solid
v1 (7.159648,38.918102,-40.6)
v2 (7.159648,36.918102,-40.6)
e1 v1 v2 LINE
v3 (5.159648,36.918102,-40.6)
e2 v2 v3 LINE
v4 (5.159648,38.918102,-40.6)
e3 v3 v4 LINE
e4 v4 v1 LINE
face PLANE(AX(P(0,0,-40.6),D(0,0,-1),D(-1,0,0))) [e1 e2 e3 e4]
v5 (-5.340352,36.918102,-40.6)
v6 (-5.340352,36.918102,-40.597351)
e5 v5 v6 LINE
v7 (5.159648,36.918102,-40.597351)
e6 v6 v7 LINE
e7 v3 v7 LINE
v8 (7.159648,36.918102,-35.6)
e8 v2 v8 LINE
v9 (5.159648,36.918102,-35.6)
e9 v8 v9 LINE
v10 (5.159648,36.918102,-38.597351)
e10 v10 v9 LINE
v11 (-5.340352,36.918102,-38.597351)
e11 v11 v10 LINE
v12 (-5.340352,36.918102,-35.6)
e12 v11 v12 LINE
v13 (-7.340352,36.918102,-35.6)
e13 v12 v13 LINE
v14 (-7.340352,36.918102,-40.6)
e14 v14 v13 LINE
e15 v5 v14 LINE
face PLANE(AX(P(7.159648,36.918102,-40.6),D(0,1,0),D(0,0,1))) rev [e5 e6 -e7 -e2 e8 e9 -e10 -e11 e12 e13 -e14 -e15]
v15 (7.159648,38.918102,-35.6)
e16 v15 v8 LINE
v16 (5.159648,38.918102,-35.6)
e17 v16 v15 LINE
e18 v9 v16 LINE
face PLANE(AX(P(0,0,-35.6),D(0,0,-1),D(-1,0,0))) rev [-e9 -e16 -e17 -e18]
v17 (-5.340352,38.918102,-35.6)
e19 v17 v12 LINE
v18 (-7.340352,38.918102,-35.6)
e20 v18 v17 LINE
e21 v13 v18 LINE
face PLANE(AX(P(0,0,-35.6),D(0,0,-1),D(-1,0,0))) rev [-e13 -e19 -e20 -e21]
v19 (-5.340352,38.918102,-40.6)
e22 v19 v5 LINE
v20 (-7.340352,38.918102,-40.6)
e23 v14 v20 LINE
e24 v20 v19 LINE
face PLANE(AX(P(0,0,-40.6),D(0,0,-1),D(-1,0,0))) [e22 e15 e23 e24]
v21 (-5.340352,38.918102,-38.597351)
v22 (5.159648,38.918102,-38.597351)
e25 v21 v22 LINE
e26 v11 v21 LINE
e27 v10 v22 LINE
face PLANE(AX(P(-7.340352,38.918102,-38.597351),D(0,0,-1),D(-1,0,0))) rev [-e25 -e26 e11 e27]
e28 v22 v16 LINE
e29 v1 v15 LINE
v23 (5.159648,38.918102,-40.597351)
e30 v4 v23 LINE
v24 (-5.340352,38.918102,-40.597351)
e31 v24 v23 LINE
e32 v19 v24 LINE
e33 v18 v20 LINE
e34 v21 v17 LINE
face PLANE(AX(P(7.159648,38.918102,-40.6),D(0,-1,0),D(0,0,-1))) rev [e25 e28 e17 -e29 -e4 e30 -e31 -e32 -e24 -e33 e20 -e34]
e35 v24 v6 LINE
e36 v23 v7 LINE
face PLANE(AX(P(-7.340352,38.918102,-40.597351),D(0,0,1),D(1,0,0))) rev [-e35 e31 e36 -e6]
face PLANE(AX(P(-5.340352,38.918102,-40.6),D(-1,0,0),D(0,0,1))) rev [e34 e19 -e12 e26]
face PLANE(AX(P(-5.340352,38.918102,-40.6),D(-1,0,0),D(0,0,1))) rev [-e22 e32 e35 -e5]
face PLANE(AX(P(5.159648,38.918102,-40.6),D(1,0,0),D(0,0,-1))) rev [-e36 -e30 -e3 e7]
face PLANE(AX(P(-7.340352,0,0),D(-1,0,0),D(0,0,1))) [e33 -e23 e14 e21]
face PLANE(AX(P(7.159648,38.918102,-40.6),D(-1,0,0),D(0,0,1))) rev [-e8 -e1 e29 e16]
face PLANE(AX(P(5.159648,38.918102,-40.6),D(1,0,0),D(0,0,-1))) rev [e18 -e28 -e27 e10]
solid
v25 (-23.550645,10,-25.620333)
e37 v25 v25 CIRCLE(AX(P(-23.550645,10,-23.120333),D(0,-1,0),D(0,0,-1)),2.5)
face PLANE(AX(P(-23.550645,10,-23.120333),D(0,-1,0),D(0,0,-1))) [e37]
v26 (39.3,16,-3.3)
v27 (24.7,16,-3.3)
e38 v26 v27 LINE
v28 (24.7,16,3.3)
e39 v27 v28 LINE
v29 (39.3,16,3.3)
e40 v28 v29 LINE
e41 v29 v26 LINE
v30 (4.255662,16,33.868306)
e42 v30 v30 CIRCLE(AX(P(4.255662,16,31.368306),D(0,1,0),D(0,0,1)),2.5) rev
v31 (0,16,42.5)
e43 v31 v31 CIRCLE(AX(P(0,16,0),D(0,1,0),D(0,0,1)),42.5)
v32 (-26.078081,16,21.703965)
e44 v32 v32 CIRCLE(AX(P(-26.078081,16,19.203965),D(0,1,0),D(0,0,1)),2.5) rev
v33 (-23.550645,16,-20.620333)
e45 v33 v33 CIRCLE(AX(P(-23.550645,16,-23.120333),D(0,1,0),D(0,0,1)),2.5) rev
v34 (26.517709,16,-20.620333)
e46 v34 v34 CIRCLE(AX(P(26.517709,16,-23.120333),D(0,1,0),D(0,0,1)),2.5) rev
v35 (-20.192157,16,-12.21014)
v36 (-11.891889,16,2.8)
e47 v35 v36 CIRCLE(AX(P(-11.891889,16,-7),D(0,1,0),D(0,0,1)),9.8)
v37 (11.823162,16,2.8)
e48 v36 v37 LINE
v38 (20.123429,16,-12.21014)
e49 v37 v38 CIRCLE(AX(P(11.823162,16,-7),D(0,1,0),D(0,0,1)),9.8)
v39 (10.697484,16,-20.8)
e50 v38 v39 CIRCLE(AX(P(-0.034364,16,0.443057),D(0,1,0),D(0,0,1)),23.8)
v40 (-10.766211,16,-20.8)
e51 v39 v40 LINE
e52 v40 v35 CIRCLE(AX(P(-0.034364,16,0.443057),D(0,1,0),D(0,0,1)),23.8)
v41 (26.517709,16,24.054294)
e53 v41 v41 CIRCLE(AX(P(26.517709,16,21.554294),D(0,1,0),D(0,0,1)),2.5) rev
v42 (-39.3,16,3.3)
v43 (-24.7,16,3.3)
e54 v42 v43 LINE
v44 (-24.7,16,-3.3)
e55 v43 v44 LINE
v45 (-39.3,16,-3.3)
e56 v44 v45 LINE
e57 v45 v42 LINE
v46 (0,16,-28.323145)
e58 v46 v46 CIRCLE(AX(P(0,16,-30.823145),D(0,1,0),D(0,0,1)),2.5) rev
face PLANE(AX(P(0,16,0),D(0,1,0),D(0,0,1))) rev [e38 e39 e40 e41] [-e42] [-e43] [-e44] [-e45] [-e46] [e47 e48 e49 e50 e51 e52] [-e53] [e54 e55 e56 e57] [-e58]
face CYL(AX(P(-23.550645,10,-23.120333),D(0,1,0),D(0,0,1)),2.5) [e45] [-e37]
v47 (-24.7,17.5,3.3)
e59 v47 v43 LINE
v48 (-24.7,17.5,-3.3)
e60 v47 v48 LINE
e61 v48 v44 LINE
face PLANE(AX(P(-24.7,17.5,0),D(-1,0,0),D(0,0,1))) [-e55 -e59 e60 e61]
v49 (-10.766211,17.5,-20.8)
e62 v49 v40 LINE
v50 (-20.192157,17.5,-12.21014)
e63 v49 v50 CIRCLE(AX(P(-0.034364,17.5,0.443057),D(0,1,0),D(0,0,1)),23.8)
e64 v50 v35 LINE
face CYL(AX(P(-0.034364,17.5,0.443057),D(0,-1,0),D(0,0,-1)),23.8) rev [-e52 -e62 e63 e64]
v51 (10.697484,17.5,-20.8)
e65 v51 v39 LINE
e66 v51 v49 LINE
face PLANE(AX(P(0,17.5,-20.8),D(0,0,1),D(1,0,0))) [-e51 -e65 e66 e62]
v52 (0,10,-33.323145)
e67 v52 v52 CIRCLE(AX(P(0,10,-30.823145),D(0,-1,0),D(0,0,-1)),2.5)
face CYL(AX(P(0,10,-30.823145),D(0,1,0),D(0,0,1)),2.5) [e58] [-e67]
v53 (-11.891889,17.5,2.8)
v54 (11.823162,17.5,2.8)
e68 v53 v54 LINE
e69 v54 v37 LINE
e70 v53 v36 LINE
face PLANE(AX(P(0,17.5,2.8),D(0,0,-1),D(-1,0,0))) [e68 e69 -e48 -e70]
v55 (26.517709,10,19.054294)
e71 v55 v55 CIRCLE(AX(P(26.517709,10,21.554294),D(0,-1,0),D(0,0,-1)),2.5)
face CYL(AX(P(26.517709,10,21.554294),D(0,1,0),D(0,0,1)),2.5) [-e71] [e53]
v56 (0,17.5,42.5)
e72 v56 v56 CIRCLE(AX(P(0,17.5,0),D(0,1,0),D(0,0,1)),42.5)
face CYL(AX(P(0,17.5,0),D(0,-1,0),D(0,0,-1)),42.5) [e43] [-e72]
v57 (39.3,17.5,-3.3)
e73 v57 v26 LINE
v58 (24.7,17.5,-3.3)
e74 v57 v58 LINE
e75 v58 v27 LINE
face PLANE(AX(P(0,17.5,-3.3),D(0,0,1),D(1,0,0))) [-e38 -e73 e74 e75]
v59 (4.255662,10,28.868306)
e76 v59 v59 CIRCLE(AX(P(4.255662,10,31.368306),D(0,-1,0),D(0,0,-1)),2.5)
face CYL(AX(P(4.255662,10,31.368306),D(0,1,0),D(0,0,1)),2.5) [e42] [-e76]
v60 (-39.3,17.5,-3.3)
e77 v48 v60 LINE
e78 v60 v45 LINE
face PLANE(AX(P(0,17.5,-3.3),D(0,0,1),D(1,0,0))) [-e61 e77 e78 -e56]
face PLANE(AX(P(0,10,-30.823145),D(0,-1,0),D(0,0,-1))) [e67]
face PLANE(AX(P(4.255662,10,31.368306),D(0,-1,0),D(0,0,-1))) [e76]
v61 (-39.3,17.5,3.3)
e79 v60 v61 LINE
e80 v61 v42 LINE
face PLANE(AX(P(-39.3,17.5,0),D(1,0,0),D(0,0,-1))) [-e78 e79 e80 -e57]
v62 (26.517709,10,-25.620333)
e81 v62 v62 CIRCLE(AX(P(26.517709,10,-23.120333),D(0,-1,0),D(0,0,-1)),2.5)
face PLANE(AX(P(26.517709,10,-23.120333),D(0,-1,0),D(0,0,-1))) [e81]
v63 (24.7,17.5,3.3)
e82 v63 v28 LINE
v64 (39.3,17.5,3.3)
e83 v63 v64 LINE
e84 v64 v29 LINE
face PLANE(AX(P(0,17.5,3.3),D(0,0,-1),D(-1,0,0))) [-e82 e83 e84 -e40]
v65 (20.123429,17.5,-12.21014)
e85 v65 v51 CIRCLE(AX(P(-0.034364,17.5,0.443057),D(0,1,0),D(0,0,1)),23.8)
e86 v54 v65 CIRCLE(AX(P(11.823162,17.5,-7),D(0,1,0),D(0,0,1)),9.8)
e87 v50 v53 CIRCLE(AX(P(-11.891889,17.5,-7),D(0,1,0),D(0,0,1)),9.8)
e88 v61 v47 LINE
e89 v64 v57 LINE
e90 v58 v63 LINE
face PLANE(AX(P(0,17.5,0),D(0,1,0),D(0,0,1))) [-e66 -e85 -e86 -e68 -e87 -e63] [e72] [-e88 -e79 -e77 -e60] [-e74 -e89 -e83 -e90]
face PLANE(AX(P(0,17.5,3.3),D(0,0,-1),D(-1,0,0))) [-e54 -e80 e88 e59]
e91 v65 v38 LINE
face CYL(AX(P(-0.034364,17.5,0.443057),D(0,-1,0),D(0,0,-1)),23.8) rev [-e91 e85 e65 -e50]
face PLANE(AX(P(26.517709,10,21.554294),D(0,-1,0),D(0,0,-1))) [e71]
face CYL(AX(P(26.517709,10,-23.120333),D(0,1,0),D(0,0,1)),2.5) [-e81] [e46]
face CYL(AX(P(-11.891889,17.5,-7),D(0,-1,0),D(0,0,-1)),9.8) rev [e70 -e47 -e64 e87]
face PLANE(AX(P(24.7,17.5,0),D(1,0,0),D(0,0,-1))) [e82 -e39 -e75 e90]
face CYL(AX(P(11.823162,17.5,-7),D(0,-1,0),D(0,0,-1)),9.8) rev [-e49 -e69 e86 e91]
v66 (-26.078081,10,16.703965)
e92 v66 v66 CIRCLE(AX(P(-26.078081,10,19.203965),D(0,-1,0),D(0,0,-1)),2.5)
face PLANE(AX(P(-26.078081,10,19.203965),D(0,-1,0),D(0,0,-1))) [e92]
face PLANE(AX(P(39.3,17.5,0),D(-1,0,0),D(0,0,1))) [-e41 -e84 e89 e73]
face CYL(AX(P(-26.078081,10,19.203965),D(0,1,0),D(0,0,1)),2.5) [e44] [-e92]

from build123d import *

# Parameters (mm, degrees)
CUT_EXTRUDE1_DEPTH           = 5
CUT_EXTRUDE3_DEPTH           = 60
SKETCH8_R                    = 43
CUT_EXTRUDE4_DEPTH           = 53
FILLET1_R                    = 7
SKETCH12_W                   = 6.5
SKETCH12_H                   = 51.5
CUT_REVOLVE1_ANGLE           = 60
CUT_REVOLVE1_OTHER_WAY_ANGLE = 60
SKETCH18_W                   = 13
SKETCH18_H                   = 8
CUT_EXTRUDE13_DEPTH          = 5
SKETCH20_W                   = 100
SKETCH20_H                   = 7
CUT_EXTRUDE15_DEPTH          = 5
SKETCH19_R                   = 1.5
CUT_EXTRUDE14_DEPTH          = 12
FILLET3_R                    = 4
SKETCH24_W                   = 2
SKETCH24_H                   = 3
BOSS_EXTRUDE3_DEPTH          = 2
CIRPATTERN2_COUNT            = 5
SKETCH26_W                   = 5
SKETCH26_H                   = 51.5
CUT_REVOLVE2_ANGLE           = 50
CUT_REVOLVE2_OTHER_WAY_ANGLE = 50
SKETCH29_W                   = 16.2
SKETCH29_H                   = 11.2
SKETCH29_W_2                 = 13
SKETCH29_H_2                 = 8
BOSS_EXTRUDE4_DEPTH          = 19
SKETCH36_W                   = 2
SKETCH36_H                   = 2
BOSS_EXTRUDE7_DEPTH          = 5
SKETCH37_W                   = 2
SKETCH37_H                   = 2
BOSS_EXTRUDE8_DEPTH          = 12.5
SKETCH40_W                   = 2
SKETCH40_H                   = 2
BOSS_EXTRUDE9_DEPTH          = 5
FILLET8_R                    = 9
SKETCH50_W                   = 13
SKETCH50_H                   = 5
CUT_EXTRUDE23_DEPTH          = 7
SKETCH51_R                   = 42.5
SKETCH51_W                   = 14.6
SKETCH51_H                   = 6.6
BOSS_EXTRUDE10_DEPTH         = 1.5
INTERSECT2_START             = 17.5
INTERSECT2_OUTLINE_R         = 45
INTERSECT2_OUTLINE_W         = 13
INTERSECT2_OUTLINE_H         = 8
INTERSECT2_DEPTH             = 59
INTERSECT2_2_OUTLINE_R       = 45
INTERSECT2_2_OUTLINE_W       = 13
INTERSECT2_2_OUTLINE_H       = 5
INTERSECT2_2_DEPTH           = 16
INTERSECT2_START_2           = 16
INTERSECT2_3_OUTLINE_R       = 45
INTERSECT2_3_OUTLINE_R_2     = 43
INTERSECT2_3_DEPTH           = 1.5
SKETCH52_R                   = 2.5
BOSS_EXTRUDE11_DEPTH         = 6


# Read off the part's stored shape, not the designer's step: Intersect2
with BuildPart() as part:
    # Sketch1 → Revolve1 (revolve)
    with BuildSketch(Plane.XY, mode=Mode.PRIVATE) as revolve1_sk:
        with BuildLine():
            Line((0, 76.5), (0, 11.5))
            Line((0, 11.5), (22.5, 11.5))
            Line((22.5, 11.5), (22.5, 0))
            Line((22.5, 0), (25, 0))
            Line((25, 0), (25, 11.5))
            Line((25, 11.5), (45, 11.5))
            Line((45, 11.5), (45, 71.5))
            ThreePointArc((45, 71.5), (43.535533906, 75.035533906), (40, 76.5))
            Line((40, 76.5), (0, 76.5))
        make_face()
    revolve(revolve1_sk.sketch.rotate(Axis((0, 2, 0), (0, 1, 0)), 90), axis=Axis((0, 2, 0), (0, 1, 0)))

    # Sketch5 → Cut-Extrude1 (cut)
    with BuildSketch(Plane(origin=(0, 76.5, 0), x_dir=(1, 0, 0), z_dir=(0, 1, 0))):
        with BuildLine():
            Line((-45, 0), (45, 0))
            ThreePointArc((45, 0), (0, 45), (-45, 0))
        make_face()
    extrude(amount=-CUT_EXTRUDE1_DEPTH, mode=Mode.SUBTRACT)

    # Sketch7 → Cut-Extrude3 (cut)
    with BuildSketch(Plane.XZ.offset(-11.5)):
        with BuildLine():
            Line((21, 0), (-21, 0))
            ThreePointArc((-21, 0), (-18.277714988, -10.340461055), (-10.816653826, -18))
            Line((-10.816653826, -18), (10.816653826, -18))
            ThreePointArc((10.816653826, -18), (18.277714988, -10.340461055), (21, 0))
        make_face()
    extrude(amount=-CUT_EXTRUDE3_DEPTH, mode=Mode.SUBTRACT)

    # Sketch8 → Cut-Extrude4 (cut)
    with BuildSketch(Plane(origin=(0, 69, 0), x_dir=(1, 0, 0), z_dir=(0, 1, 0))):
        with Locations(Location((0, 0, 0), (0, 0, 270))):
            Circle(SKETCH8_R)
        with BuildLine():
            Line((22.912878475, -2), (-22.981606036, -2))
            ThreePointArc((-22.981606036, -2), (-20.067855169, 10.855581536), (-10.573881727, 20))
            Line((-10.573881727, 20), (10.505154166, 20))
            ThreePointArc((10.505154166, 20), (19.999127608, 10.855581536), (22.912878475, -2))
        make_face(mode=Mode.SUBTRACT)
    extrude(amount=-CUT_EXTRUDE4_DEPTH, mode=Mode.SUBTRACT)

    # Fillet1
    fillet1_edges = [part.edges().sort_by_distance(p)[0] for p in [
        (-21, 41.5, 0),
        (21, 41.5, 0),
    ]]
    fillet(fillet1_edges, radius=FILLET1_R)

    # Sketch12 → Cut-Revolve1 (revolve, cut)
    with BuildSketch(Plane(origin=(0, 0, 0), x_dir=(0, 0, -1), z_dir=(1, 0, 0))):
        with Locations((-44.75, 43.25)):
            Rectangle(SKETCH12_W, SKETCH12_H)
    revolve(axis=Axis((0, 71.5, 0), (0, -1, 0)), revolution_arc=CUT_REVOLVE1_ANGLE, mode=Mode.SUBTRACT)

    # Sketch12 → Cut-Revolve1 other way (revolve, cut)
    with BuildSketch(Plane(origin=(0, 0, 0), x_dir=(0, 0, -1), z_dir=(1, 0, 0))):
        with Locations((-44.75, 43.25)):
            Rectangle(SKETCH12_W, SKETCH12_H)
    revolve(axis=Axis((0, 71.5, 0), (0, 1, 0)), revolution_arc=CUT_REVOLVE1_OTHER_WAY_ANGLE, mode=Mode.SUBTRACT)

    # Sketch18 → Cut-Extrude13 (cut)
    with BuildSketch(Plane(origin=(0, 71.5, 0), x_dir=(1, 0, 0), z_dir=(0, 1, 0))):
        with Locations((0, 30)):
            Rectangle(SKETCH18_W, SKETCH18_H)
    extrude(amount=-CUT_EXTRUDE13_DEPTH, mode=Mode.SUBTRACT)

    # Sketch20 → Cut-Extrude15 (cut)
    with BuildSketch(Plane(origin=(0, 76.5, 0), x_dir=(1, 0, 0), z_dir=(0, 1, 0))):
        with Locations((0, -3.5)):
            Rectangle(SKETCH20_W, SKETCH20_H)
    extrude(amount=-CUT_EXTRUDE15_DEPTH, mode=Mode.SUBTRACT)

    # Sketch19 → Cut-Extrude14 (cut)
    with BuildSketch(Plane(origin=(0, 0, 7), x_dir=(-1, 0, 0), z_dir=(0, 0, -1))):
        with Locations((0, 74)):
            Circle(SKETCH19_R)
        with Locations((-30, 74)):
            Circle(SKETCH19_R)
        with Locations((29.452221542, 74)):
            Circle(SKETCH19_R)
    extrude(amount=-CUT_EXTRUDE14_DEPTH, mode=Mode.SUBTRACT)

    # Fillet3
    fillet3_edges = [part.edges().sort_by_distance(p)[0] for p in [
        (0, 11.5, 45),
    ]]
    fillet(fillet3_edges, radius=FILLET3_R)

    # Sketch24 → Boss-Extrude3 (add)
    with BuildSketch(Plane.XZ):
        with Locations((0, -22.5)):
            Rectangle(SKETCH24_W, SKETCH24_H)
    boss_extrude3 = extrude(amount=-BOSS_EXTRUDE3_DEPTH)

    # CirPattern2: Boss-Extrude3 ×5 about axis
    cirpattern2_axis = Axis((0, 0, 0), (0, 1, 0))
    for i in range(1, CIRPATTERN2_COUNT):
        add(boss_extrude3.rotate(cirpattern2_axis, i * 360 / CIRPATTERN2_COUNT))

    # Sketch26 → Cut-Revolve2 (revolve, cut)
    with BuildSketch(Plane(origin=(0, 0, 0), x_dir=(0, 0, -1), z_dir=(1, 0, 0))):
        with Locations((45.056943441, 43.25)):
            Rectangle(SKETCH26_W, SKETCH26_H)
    revolve(axis=Axis((0, 2, 0), (0, -1, 0)), revolution_arc=CUT_REVOLVE2_ANGLE, mode=Mode.SUBTRACT)

    # Sketch26 → Cut-Revolve2 other way (revolve, cut)
    with BuildSketch(Plane(origin=(0, 0, 0), x_dir=(0, 0, -1), z_dir=(1, 0, 0))):
        with Locations((45.056943441, 43.25)):
            Rectangle(SKETCH26_W, SKETCH26_H)
    revolve(axis=Axis((0, 2, 0), (0, 1, 0)), revolution_arc=CUT_REVOLVE2_OTHER_WAY_ANGLE, mode=Mode.SUBTRACT)

    # Sketch29 → Boss-Extrude4 (add)
    with BuildSketch(Plane.XZ.offset(-69)):
        with Locations((0, -30)):
            Rectangle(SKETCH29_W, SKETCH29_H)
        with Locations((0, -30)):
            Rectangle(SKETCH29_W_2, SKETCH29_H_2, mode=Mode.SUBTRACT)
    extrude(amount=BOSS_EXTRUDE4_DEPTH)

    # Fillet8
    fillet8_edges = [part.edges().sort_by_distance(p)[0] for p in [
        (-22.981606036, 42.5, 2),
        (22.912878475, 42.5, 2),
    ]]
    fillet(fillet8_edges, radius=FILLET8_R)

    # Sketch50 → Cut-Extrude23 (cut)
    with BuildSketch(Plane(origin=(0, 16, 0), x_dir=(1, 0, 0), z_dir=(0, 1, 0))):
        with Locations((32, 0)):
            Rectangle(SKETCH50_W, SKETCH50_H)
        with Locations((-32, 0)):
            Rectangle(SKETCH50_W, SKETCH50_H)
    extrude(amount=-CUT_EXTRUDE23_DEPTH, mode=Mode.SUBTRACT)

    # Sketch51 → Boss-Extrude10 (add)
    with BuildSketch(Plane(origin=(0, 16, 0), x_dir=(1, 0, 0), z_dir=(0, 1, 0))):
        with Locations(Location((0, 0, 0), (0, 0, 270))):
            Circle(SKETCH51_R)
        with Locations((32, 0)):
            Rectangle(SKETCH51_W, SKETCH51_H, mode=Mode.SUBTRACT)
        with Locations((-32, 0)):
            Rectangle(SKETCH51_W, SKETCH51_H, mode=Mode.SUBTRACT)
        with BuildLine():
            ThreePointArc((-20.192156993, 12.210139591), (-20.468000439, 2.257604402), (-11.8918892, -2.8))
            Line((-11.8918892, -2.8), (11.823161639, -2.8))
            ThreePointArc((11.823161639, -2.8), (20.399272878, 2.257604402), (20.123429432, 12.210139591))
            ThreePointArc((20.123429432, 12.210139591), (15.996509538, 17.148165703), (10.697483593, 20.8))
            Line((10.697483593, 20.8), (-10.766211154, 20.8))
            ThreePointArc((-10.766211154, 20.8), (-16.065237099, 17.148165703), (-20.192156993, 12.210139591))
        make_face(mode=Mode.SUBTRACT)
    extrude(amount=BOSS_EXTRUDE10_DEPTH)

    # Intersect2 outline → Intersect2 (cut)
    with BuildSketch(Plane(origin=(0, 0, 0), x_dir=(1, 0, 0), z_dir=(0, 1, 0)).offset(INTERSECT2_START)):
        Circle(INTERSECT2_OUTLINE_R)
        with Locations((0, 30)):
            Rectangle(INTERSECT2_OUTLINE_W, INTERSECT2_OUTLINE_H, mode=Mode.SUBTRACT)
        with BuildLine():
            ThreePointArc((-18.186533479, 10.5), (-14.978608696, 14.718739128), (-10.816653826, 18))
            Line((-10.816653826, 18), (10.816653826, 18))
            ThreePointArc((10.816653826, 18), (14.978608696, 14.718739128), (18.186533479, 10.5))
            ThreePointArc((18.186533479, 10.5), (18.186533479, 3.5), (12.124355653, 0))
            Line((12.124355653, 0), (-12.124355653, 0))
            ThreePointArc((-12.124355653, 0), (-18.186533479, 3.5), (-18.186533479, 10.5))
        make_face(mode=Mode.SUBTRACT)
    extrude(amount=INTERSECT2_DEPTH, mode=Mode.SUBTRACT)

    # Intersect2 2 outline → Intersect2 2 (cut)
    with BuildSketch(Plane(origin=(0, 0, 0), x_dir=(1, 0, 0), z_dir=(0, 1, 0))):
        Circle(INTERSECT2_2_OUTLINE_R)
        with Locations((-32, 0)):
            Rectangle(INTERSECT2_2_OUTLINE_W, INTERSECT2_2_OUTLINE_H, mode=Mode.SUBTRACT)
        with Locations((32, 0)):
            Rectangle(INTERSECT2_2_OUTLINE_W, INTERSECT2_2_OUTLINE_H, mode=Mode.SUBTRACT)
        with BuildLine():
            ThreePointArc((-18.186533479, 10.5), (-14.978608696, 14.718739128), (-10.816653826, 18))
            Line((-10.816653826, 18), (10.816653826, 18))
            ThreePointArc((10.816653826, 18), (14.978608696, 14.718739128), (18.186533479, 10.5))
            ThreePointArc((18.186533479, 10.5), (18.186533479, 3.5), (12.124355653, 0))
            Line((12.124355653, 0), (-12.124355653, 0))
            ThreePointArc((-12.124355653, 0), (-18.186533479, 3.5), (-18.186533479, 10.5))
        make_face(mode=Mode.SUBTRACT)
    extrude(amount=INTERSECT2_2_DEPTH, mode=Mode.SUBTRACT)

    # Intersect2 3 outline → Intersect2 3 (cut)
    # profile 1 of 2: a face of its own
    with BuildSketch(Plane(origin=(0, 0, 0), x_dir=(1, 0, 0), z_dir=(0, 1, 0)).offset(INTERSECT2_START_2)):
        Circle(INTERSECT2_3_OUTLINE_R)
        Circle(INTERSECT2_3_OUTLINE_R_2, mode=Mode.SUBTRACT)
    # profile 2 of 2: a face of its own
    with BuildSketch(Plane(origin=(0, 0, 0), x_dir=(1, 0, 0), z_dir=(0, 1, 0)).offset(INTERSECT2_START_2)):
        with BuildLine():
            Line((-11.8918892, -2), (11.823161639, -2))
            ThreePointArc((11.823161639, -2), (19.699182165, 2.644738737), (19.445856551, 11.784822073))
            ThreePointArc((19.445856551, 11.784822073), (15.52739893, 16.493045158), (10.505154166, 20))
            Line((10.505154166, 20), (-10.573881727, 20))
            ThreePointArc((-10.573881727, 20), (-15.596126491, 16.493045158), (-19.514584112, 11.784822073))
            ThreePointArc((-19.514584112, 11.784822073), (-19.767909726, 2.644738737), (-11.8918892, -2))
        make_face()
        with BuildLine():
            Line((-10.816653826, 18), (10.816653826, 18))
            ThreePointArc((10.816653826, 18), (14.978608696, 14.718739128), (18.186533479, 10.5))
            ThreePointArc((18.186533479, 10.5), (18.186533479, 3.5), (12.124355653, 0))
            Line((12.124355653, 0), (-12.124355653, 0))
            ThreePointArc((-12.124355653, 0), (-18.186533479, 3.5), (-18.186533479, 10.5))
            ThreePointArc((-18.186533479, 10.5), (-14.978608696, 14.718739128), (-10.816653826, 18))
        make_face(mode=Mode.SUBTRACT)
    extrude(amount=INTERSECT2_3_DEPTH, mode=Mode.SUBTRACT)

    # Sketch52 → Boss-Extrude11 (add)
    with BuildSketch(Plane.XZ.offset(-16)):
        with Locations(Location((26.517708618, 21.554294378, 0), (0, 0, 90))):
            Circle(SKETCH52_R)
        with Locations(Location((4.255662389, 31.368306058, 0), (0, 0, 90))):
            Circle(SKETCH52_R)
        with Locations(Location((-26.078081375, 19.203965316, 0), (0, 0, 90))):
            Circle(SKETCH52_R)
        with Locations(Location((-23.550645182, -23.120332988, 0), (0, 0, 90))):
            Circle(SKETCH52_R)
        with Locations(Location((0, -30.823145317, 0), (0, 0, 90))):
            Circle(SKETCH52_R)
        with Locations(Location((26.517708618, -23.120332988, 0), (0, 0, 90))):
            Circle(SKETCH52_R)
    extrude(amount=BOSS_EXTRUDE11_DEPTH)


with BuildPart() as body_2:
    # Sketch36 → Boss-Extrude7 (new body)
    with BuildSketch(Plane(origin=(0, 0, -35.6), x_dir=(-1, 0, 0), z_dir=(0, 0, -1))):
        with Locations((-6.159647943, 37.918102195)):
            Rectangle(SKETCH36_W, SKETCH36_H)
    extrude(amount=BOSS_EXTRUDE7_DEPTH)

    # Sketch37 → Boss-Extrude8 (add)
    with BuildSketch(Plane.ZY.offset(-5.159647943)):
        with Locations((-39.597351245, 37.918102195)):
            Rectangle(SKETCH37_W, SKETCH37_H)
    extrude(amount=BOSS_EXTRUDE8_DEPTH)

    # Sketch40 → Boss-Extrude9 (add)
    with BuildSketch(Plane(origin=(0, 0, -35.6), x_dir=(-1, 0, 0), z_dir=(0, 0, -1))):
        with Locations((6.340352057, 37.918102195)):
            Rectangle(SKETCH40_W, SKETCH40_H)
    extrude(amount=BOSS_EXTRUDE9_DEPTH)


solid = Compound([part.part, body_2.part])
